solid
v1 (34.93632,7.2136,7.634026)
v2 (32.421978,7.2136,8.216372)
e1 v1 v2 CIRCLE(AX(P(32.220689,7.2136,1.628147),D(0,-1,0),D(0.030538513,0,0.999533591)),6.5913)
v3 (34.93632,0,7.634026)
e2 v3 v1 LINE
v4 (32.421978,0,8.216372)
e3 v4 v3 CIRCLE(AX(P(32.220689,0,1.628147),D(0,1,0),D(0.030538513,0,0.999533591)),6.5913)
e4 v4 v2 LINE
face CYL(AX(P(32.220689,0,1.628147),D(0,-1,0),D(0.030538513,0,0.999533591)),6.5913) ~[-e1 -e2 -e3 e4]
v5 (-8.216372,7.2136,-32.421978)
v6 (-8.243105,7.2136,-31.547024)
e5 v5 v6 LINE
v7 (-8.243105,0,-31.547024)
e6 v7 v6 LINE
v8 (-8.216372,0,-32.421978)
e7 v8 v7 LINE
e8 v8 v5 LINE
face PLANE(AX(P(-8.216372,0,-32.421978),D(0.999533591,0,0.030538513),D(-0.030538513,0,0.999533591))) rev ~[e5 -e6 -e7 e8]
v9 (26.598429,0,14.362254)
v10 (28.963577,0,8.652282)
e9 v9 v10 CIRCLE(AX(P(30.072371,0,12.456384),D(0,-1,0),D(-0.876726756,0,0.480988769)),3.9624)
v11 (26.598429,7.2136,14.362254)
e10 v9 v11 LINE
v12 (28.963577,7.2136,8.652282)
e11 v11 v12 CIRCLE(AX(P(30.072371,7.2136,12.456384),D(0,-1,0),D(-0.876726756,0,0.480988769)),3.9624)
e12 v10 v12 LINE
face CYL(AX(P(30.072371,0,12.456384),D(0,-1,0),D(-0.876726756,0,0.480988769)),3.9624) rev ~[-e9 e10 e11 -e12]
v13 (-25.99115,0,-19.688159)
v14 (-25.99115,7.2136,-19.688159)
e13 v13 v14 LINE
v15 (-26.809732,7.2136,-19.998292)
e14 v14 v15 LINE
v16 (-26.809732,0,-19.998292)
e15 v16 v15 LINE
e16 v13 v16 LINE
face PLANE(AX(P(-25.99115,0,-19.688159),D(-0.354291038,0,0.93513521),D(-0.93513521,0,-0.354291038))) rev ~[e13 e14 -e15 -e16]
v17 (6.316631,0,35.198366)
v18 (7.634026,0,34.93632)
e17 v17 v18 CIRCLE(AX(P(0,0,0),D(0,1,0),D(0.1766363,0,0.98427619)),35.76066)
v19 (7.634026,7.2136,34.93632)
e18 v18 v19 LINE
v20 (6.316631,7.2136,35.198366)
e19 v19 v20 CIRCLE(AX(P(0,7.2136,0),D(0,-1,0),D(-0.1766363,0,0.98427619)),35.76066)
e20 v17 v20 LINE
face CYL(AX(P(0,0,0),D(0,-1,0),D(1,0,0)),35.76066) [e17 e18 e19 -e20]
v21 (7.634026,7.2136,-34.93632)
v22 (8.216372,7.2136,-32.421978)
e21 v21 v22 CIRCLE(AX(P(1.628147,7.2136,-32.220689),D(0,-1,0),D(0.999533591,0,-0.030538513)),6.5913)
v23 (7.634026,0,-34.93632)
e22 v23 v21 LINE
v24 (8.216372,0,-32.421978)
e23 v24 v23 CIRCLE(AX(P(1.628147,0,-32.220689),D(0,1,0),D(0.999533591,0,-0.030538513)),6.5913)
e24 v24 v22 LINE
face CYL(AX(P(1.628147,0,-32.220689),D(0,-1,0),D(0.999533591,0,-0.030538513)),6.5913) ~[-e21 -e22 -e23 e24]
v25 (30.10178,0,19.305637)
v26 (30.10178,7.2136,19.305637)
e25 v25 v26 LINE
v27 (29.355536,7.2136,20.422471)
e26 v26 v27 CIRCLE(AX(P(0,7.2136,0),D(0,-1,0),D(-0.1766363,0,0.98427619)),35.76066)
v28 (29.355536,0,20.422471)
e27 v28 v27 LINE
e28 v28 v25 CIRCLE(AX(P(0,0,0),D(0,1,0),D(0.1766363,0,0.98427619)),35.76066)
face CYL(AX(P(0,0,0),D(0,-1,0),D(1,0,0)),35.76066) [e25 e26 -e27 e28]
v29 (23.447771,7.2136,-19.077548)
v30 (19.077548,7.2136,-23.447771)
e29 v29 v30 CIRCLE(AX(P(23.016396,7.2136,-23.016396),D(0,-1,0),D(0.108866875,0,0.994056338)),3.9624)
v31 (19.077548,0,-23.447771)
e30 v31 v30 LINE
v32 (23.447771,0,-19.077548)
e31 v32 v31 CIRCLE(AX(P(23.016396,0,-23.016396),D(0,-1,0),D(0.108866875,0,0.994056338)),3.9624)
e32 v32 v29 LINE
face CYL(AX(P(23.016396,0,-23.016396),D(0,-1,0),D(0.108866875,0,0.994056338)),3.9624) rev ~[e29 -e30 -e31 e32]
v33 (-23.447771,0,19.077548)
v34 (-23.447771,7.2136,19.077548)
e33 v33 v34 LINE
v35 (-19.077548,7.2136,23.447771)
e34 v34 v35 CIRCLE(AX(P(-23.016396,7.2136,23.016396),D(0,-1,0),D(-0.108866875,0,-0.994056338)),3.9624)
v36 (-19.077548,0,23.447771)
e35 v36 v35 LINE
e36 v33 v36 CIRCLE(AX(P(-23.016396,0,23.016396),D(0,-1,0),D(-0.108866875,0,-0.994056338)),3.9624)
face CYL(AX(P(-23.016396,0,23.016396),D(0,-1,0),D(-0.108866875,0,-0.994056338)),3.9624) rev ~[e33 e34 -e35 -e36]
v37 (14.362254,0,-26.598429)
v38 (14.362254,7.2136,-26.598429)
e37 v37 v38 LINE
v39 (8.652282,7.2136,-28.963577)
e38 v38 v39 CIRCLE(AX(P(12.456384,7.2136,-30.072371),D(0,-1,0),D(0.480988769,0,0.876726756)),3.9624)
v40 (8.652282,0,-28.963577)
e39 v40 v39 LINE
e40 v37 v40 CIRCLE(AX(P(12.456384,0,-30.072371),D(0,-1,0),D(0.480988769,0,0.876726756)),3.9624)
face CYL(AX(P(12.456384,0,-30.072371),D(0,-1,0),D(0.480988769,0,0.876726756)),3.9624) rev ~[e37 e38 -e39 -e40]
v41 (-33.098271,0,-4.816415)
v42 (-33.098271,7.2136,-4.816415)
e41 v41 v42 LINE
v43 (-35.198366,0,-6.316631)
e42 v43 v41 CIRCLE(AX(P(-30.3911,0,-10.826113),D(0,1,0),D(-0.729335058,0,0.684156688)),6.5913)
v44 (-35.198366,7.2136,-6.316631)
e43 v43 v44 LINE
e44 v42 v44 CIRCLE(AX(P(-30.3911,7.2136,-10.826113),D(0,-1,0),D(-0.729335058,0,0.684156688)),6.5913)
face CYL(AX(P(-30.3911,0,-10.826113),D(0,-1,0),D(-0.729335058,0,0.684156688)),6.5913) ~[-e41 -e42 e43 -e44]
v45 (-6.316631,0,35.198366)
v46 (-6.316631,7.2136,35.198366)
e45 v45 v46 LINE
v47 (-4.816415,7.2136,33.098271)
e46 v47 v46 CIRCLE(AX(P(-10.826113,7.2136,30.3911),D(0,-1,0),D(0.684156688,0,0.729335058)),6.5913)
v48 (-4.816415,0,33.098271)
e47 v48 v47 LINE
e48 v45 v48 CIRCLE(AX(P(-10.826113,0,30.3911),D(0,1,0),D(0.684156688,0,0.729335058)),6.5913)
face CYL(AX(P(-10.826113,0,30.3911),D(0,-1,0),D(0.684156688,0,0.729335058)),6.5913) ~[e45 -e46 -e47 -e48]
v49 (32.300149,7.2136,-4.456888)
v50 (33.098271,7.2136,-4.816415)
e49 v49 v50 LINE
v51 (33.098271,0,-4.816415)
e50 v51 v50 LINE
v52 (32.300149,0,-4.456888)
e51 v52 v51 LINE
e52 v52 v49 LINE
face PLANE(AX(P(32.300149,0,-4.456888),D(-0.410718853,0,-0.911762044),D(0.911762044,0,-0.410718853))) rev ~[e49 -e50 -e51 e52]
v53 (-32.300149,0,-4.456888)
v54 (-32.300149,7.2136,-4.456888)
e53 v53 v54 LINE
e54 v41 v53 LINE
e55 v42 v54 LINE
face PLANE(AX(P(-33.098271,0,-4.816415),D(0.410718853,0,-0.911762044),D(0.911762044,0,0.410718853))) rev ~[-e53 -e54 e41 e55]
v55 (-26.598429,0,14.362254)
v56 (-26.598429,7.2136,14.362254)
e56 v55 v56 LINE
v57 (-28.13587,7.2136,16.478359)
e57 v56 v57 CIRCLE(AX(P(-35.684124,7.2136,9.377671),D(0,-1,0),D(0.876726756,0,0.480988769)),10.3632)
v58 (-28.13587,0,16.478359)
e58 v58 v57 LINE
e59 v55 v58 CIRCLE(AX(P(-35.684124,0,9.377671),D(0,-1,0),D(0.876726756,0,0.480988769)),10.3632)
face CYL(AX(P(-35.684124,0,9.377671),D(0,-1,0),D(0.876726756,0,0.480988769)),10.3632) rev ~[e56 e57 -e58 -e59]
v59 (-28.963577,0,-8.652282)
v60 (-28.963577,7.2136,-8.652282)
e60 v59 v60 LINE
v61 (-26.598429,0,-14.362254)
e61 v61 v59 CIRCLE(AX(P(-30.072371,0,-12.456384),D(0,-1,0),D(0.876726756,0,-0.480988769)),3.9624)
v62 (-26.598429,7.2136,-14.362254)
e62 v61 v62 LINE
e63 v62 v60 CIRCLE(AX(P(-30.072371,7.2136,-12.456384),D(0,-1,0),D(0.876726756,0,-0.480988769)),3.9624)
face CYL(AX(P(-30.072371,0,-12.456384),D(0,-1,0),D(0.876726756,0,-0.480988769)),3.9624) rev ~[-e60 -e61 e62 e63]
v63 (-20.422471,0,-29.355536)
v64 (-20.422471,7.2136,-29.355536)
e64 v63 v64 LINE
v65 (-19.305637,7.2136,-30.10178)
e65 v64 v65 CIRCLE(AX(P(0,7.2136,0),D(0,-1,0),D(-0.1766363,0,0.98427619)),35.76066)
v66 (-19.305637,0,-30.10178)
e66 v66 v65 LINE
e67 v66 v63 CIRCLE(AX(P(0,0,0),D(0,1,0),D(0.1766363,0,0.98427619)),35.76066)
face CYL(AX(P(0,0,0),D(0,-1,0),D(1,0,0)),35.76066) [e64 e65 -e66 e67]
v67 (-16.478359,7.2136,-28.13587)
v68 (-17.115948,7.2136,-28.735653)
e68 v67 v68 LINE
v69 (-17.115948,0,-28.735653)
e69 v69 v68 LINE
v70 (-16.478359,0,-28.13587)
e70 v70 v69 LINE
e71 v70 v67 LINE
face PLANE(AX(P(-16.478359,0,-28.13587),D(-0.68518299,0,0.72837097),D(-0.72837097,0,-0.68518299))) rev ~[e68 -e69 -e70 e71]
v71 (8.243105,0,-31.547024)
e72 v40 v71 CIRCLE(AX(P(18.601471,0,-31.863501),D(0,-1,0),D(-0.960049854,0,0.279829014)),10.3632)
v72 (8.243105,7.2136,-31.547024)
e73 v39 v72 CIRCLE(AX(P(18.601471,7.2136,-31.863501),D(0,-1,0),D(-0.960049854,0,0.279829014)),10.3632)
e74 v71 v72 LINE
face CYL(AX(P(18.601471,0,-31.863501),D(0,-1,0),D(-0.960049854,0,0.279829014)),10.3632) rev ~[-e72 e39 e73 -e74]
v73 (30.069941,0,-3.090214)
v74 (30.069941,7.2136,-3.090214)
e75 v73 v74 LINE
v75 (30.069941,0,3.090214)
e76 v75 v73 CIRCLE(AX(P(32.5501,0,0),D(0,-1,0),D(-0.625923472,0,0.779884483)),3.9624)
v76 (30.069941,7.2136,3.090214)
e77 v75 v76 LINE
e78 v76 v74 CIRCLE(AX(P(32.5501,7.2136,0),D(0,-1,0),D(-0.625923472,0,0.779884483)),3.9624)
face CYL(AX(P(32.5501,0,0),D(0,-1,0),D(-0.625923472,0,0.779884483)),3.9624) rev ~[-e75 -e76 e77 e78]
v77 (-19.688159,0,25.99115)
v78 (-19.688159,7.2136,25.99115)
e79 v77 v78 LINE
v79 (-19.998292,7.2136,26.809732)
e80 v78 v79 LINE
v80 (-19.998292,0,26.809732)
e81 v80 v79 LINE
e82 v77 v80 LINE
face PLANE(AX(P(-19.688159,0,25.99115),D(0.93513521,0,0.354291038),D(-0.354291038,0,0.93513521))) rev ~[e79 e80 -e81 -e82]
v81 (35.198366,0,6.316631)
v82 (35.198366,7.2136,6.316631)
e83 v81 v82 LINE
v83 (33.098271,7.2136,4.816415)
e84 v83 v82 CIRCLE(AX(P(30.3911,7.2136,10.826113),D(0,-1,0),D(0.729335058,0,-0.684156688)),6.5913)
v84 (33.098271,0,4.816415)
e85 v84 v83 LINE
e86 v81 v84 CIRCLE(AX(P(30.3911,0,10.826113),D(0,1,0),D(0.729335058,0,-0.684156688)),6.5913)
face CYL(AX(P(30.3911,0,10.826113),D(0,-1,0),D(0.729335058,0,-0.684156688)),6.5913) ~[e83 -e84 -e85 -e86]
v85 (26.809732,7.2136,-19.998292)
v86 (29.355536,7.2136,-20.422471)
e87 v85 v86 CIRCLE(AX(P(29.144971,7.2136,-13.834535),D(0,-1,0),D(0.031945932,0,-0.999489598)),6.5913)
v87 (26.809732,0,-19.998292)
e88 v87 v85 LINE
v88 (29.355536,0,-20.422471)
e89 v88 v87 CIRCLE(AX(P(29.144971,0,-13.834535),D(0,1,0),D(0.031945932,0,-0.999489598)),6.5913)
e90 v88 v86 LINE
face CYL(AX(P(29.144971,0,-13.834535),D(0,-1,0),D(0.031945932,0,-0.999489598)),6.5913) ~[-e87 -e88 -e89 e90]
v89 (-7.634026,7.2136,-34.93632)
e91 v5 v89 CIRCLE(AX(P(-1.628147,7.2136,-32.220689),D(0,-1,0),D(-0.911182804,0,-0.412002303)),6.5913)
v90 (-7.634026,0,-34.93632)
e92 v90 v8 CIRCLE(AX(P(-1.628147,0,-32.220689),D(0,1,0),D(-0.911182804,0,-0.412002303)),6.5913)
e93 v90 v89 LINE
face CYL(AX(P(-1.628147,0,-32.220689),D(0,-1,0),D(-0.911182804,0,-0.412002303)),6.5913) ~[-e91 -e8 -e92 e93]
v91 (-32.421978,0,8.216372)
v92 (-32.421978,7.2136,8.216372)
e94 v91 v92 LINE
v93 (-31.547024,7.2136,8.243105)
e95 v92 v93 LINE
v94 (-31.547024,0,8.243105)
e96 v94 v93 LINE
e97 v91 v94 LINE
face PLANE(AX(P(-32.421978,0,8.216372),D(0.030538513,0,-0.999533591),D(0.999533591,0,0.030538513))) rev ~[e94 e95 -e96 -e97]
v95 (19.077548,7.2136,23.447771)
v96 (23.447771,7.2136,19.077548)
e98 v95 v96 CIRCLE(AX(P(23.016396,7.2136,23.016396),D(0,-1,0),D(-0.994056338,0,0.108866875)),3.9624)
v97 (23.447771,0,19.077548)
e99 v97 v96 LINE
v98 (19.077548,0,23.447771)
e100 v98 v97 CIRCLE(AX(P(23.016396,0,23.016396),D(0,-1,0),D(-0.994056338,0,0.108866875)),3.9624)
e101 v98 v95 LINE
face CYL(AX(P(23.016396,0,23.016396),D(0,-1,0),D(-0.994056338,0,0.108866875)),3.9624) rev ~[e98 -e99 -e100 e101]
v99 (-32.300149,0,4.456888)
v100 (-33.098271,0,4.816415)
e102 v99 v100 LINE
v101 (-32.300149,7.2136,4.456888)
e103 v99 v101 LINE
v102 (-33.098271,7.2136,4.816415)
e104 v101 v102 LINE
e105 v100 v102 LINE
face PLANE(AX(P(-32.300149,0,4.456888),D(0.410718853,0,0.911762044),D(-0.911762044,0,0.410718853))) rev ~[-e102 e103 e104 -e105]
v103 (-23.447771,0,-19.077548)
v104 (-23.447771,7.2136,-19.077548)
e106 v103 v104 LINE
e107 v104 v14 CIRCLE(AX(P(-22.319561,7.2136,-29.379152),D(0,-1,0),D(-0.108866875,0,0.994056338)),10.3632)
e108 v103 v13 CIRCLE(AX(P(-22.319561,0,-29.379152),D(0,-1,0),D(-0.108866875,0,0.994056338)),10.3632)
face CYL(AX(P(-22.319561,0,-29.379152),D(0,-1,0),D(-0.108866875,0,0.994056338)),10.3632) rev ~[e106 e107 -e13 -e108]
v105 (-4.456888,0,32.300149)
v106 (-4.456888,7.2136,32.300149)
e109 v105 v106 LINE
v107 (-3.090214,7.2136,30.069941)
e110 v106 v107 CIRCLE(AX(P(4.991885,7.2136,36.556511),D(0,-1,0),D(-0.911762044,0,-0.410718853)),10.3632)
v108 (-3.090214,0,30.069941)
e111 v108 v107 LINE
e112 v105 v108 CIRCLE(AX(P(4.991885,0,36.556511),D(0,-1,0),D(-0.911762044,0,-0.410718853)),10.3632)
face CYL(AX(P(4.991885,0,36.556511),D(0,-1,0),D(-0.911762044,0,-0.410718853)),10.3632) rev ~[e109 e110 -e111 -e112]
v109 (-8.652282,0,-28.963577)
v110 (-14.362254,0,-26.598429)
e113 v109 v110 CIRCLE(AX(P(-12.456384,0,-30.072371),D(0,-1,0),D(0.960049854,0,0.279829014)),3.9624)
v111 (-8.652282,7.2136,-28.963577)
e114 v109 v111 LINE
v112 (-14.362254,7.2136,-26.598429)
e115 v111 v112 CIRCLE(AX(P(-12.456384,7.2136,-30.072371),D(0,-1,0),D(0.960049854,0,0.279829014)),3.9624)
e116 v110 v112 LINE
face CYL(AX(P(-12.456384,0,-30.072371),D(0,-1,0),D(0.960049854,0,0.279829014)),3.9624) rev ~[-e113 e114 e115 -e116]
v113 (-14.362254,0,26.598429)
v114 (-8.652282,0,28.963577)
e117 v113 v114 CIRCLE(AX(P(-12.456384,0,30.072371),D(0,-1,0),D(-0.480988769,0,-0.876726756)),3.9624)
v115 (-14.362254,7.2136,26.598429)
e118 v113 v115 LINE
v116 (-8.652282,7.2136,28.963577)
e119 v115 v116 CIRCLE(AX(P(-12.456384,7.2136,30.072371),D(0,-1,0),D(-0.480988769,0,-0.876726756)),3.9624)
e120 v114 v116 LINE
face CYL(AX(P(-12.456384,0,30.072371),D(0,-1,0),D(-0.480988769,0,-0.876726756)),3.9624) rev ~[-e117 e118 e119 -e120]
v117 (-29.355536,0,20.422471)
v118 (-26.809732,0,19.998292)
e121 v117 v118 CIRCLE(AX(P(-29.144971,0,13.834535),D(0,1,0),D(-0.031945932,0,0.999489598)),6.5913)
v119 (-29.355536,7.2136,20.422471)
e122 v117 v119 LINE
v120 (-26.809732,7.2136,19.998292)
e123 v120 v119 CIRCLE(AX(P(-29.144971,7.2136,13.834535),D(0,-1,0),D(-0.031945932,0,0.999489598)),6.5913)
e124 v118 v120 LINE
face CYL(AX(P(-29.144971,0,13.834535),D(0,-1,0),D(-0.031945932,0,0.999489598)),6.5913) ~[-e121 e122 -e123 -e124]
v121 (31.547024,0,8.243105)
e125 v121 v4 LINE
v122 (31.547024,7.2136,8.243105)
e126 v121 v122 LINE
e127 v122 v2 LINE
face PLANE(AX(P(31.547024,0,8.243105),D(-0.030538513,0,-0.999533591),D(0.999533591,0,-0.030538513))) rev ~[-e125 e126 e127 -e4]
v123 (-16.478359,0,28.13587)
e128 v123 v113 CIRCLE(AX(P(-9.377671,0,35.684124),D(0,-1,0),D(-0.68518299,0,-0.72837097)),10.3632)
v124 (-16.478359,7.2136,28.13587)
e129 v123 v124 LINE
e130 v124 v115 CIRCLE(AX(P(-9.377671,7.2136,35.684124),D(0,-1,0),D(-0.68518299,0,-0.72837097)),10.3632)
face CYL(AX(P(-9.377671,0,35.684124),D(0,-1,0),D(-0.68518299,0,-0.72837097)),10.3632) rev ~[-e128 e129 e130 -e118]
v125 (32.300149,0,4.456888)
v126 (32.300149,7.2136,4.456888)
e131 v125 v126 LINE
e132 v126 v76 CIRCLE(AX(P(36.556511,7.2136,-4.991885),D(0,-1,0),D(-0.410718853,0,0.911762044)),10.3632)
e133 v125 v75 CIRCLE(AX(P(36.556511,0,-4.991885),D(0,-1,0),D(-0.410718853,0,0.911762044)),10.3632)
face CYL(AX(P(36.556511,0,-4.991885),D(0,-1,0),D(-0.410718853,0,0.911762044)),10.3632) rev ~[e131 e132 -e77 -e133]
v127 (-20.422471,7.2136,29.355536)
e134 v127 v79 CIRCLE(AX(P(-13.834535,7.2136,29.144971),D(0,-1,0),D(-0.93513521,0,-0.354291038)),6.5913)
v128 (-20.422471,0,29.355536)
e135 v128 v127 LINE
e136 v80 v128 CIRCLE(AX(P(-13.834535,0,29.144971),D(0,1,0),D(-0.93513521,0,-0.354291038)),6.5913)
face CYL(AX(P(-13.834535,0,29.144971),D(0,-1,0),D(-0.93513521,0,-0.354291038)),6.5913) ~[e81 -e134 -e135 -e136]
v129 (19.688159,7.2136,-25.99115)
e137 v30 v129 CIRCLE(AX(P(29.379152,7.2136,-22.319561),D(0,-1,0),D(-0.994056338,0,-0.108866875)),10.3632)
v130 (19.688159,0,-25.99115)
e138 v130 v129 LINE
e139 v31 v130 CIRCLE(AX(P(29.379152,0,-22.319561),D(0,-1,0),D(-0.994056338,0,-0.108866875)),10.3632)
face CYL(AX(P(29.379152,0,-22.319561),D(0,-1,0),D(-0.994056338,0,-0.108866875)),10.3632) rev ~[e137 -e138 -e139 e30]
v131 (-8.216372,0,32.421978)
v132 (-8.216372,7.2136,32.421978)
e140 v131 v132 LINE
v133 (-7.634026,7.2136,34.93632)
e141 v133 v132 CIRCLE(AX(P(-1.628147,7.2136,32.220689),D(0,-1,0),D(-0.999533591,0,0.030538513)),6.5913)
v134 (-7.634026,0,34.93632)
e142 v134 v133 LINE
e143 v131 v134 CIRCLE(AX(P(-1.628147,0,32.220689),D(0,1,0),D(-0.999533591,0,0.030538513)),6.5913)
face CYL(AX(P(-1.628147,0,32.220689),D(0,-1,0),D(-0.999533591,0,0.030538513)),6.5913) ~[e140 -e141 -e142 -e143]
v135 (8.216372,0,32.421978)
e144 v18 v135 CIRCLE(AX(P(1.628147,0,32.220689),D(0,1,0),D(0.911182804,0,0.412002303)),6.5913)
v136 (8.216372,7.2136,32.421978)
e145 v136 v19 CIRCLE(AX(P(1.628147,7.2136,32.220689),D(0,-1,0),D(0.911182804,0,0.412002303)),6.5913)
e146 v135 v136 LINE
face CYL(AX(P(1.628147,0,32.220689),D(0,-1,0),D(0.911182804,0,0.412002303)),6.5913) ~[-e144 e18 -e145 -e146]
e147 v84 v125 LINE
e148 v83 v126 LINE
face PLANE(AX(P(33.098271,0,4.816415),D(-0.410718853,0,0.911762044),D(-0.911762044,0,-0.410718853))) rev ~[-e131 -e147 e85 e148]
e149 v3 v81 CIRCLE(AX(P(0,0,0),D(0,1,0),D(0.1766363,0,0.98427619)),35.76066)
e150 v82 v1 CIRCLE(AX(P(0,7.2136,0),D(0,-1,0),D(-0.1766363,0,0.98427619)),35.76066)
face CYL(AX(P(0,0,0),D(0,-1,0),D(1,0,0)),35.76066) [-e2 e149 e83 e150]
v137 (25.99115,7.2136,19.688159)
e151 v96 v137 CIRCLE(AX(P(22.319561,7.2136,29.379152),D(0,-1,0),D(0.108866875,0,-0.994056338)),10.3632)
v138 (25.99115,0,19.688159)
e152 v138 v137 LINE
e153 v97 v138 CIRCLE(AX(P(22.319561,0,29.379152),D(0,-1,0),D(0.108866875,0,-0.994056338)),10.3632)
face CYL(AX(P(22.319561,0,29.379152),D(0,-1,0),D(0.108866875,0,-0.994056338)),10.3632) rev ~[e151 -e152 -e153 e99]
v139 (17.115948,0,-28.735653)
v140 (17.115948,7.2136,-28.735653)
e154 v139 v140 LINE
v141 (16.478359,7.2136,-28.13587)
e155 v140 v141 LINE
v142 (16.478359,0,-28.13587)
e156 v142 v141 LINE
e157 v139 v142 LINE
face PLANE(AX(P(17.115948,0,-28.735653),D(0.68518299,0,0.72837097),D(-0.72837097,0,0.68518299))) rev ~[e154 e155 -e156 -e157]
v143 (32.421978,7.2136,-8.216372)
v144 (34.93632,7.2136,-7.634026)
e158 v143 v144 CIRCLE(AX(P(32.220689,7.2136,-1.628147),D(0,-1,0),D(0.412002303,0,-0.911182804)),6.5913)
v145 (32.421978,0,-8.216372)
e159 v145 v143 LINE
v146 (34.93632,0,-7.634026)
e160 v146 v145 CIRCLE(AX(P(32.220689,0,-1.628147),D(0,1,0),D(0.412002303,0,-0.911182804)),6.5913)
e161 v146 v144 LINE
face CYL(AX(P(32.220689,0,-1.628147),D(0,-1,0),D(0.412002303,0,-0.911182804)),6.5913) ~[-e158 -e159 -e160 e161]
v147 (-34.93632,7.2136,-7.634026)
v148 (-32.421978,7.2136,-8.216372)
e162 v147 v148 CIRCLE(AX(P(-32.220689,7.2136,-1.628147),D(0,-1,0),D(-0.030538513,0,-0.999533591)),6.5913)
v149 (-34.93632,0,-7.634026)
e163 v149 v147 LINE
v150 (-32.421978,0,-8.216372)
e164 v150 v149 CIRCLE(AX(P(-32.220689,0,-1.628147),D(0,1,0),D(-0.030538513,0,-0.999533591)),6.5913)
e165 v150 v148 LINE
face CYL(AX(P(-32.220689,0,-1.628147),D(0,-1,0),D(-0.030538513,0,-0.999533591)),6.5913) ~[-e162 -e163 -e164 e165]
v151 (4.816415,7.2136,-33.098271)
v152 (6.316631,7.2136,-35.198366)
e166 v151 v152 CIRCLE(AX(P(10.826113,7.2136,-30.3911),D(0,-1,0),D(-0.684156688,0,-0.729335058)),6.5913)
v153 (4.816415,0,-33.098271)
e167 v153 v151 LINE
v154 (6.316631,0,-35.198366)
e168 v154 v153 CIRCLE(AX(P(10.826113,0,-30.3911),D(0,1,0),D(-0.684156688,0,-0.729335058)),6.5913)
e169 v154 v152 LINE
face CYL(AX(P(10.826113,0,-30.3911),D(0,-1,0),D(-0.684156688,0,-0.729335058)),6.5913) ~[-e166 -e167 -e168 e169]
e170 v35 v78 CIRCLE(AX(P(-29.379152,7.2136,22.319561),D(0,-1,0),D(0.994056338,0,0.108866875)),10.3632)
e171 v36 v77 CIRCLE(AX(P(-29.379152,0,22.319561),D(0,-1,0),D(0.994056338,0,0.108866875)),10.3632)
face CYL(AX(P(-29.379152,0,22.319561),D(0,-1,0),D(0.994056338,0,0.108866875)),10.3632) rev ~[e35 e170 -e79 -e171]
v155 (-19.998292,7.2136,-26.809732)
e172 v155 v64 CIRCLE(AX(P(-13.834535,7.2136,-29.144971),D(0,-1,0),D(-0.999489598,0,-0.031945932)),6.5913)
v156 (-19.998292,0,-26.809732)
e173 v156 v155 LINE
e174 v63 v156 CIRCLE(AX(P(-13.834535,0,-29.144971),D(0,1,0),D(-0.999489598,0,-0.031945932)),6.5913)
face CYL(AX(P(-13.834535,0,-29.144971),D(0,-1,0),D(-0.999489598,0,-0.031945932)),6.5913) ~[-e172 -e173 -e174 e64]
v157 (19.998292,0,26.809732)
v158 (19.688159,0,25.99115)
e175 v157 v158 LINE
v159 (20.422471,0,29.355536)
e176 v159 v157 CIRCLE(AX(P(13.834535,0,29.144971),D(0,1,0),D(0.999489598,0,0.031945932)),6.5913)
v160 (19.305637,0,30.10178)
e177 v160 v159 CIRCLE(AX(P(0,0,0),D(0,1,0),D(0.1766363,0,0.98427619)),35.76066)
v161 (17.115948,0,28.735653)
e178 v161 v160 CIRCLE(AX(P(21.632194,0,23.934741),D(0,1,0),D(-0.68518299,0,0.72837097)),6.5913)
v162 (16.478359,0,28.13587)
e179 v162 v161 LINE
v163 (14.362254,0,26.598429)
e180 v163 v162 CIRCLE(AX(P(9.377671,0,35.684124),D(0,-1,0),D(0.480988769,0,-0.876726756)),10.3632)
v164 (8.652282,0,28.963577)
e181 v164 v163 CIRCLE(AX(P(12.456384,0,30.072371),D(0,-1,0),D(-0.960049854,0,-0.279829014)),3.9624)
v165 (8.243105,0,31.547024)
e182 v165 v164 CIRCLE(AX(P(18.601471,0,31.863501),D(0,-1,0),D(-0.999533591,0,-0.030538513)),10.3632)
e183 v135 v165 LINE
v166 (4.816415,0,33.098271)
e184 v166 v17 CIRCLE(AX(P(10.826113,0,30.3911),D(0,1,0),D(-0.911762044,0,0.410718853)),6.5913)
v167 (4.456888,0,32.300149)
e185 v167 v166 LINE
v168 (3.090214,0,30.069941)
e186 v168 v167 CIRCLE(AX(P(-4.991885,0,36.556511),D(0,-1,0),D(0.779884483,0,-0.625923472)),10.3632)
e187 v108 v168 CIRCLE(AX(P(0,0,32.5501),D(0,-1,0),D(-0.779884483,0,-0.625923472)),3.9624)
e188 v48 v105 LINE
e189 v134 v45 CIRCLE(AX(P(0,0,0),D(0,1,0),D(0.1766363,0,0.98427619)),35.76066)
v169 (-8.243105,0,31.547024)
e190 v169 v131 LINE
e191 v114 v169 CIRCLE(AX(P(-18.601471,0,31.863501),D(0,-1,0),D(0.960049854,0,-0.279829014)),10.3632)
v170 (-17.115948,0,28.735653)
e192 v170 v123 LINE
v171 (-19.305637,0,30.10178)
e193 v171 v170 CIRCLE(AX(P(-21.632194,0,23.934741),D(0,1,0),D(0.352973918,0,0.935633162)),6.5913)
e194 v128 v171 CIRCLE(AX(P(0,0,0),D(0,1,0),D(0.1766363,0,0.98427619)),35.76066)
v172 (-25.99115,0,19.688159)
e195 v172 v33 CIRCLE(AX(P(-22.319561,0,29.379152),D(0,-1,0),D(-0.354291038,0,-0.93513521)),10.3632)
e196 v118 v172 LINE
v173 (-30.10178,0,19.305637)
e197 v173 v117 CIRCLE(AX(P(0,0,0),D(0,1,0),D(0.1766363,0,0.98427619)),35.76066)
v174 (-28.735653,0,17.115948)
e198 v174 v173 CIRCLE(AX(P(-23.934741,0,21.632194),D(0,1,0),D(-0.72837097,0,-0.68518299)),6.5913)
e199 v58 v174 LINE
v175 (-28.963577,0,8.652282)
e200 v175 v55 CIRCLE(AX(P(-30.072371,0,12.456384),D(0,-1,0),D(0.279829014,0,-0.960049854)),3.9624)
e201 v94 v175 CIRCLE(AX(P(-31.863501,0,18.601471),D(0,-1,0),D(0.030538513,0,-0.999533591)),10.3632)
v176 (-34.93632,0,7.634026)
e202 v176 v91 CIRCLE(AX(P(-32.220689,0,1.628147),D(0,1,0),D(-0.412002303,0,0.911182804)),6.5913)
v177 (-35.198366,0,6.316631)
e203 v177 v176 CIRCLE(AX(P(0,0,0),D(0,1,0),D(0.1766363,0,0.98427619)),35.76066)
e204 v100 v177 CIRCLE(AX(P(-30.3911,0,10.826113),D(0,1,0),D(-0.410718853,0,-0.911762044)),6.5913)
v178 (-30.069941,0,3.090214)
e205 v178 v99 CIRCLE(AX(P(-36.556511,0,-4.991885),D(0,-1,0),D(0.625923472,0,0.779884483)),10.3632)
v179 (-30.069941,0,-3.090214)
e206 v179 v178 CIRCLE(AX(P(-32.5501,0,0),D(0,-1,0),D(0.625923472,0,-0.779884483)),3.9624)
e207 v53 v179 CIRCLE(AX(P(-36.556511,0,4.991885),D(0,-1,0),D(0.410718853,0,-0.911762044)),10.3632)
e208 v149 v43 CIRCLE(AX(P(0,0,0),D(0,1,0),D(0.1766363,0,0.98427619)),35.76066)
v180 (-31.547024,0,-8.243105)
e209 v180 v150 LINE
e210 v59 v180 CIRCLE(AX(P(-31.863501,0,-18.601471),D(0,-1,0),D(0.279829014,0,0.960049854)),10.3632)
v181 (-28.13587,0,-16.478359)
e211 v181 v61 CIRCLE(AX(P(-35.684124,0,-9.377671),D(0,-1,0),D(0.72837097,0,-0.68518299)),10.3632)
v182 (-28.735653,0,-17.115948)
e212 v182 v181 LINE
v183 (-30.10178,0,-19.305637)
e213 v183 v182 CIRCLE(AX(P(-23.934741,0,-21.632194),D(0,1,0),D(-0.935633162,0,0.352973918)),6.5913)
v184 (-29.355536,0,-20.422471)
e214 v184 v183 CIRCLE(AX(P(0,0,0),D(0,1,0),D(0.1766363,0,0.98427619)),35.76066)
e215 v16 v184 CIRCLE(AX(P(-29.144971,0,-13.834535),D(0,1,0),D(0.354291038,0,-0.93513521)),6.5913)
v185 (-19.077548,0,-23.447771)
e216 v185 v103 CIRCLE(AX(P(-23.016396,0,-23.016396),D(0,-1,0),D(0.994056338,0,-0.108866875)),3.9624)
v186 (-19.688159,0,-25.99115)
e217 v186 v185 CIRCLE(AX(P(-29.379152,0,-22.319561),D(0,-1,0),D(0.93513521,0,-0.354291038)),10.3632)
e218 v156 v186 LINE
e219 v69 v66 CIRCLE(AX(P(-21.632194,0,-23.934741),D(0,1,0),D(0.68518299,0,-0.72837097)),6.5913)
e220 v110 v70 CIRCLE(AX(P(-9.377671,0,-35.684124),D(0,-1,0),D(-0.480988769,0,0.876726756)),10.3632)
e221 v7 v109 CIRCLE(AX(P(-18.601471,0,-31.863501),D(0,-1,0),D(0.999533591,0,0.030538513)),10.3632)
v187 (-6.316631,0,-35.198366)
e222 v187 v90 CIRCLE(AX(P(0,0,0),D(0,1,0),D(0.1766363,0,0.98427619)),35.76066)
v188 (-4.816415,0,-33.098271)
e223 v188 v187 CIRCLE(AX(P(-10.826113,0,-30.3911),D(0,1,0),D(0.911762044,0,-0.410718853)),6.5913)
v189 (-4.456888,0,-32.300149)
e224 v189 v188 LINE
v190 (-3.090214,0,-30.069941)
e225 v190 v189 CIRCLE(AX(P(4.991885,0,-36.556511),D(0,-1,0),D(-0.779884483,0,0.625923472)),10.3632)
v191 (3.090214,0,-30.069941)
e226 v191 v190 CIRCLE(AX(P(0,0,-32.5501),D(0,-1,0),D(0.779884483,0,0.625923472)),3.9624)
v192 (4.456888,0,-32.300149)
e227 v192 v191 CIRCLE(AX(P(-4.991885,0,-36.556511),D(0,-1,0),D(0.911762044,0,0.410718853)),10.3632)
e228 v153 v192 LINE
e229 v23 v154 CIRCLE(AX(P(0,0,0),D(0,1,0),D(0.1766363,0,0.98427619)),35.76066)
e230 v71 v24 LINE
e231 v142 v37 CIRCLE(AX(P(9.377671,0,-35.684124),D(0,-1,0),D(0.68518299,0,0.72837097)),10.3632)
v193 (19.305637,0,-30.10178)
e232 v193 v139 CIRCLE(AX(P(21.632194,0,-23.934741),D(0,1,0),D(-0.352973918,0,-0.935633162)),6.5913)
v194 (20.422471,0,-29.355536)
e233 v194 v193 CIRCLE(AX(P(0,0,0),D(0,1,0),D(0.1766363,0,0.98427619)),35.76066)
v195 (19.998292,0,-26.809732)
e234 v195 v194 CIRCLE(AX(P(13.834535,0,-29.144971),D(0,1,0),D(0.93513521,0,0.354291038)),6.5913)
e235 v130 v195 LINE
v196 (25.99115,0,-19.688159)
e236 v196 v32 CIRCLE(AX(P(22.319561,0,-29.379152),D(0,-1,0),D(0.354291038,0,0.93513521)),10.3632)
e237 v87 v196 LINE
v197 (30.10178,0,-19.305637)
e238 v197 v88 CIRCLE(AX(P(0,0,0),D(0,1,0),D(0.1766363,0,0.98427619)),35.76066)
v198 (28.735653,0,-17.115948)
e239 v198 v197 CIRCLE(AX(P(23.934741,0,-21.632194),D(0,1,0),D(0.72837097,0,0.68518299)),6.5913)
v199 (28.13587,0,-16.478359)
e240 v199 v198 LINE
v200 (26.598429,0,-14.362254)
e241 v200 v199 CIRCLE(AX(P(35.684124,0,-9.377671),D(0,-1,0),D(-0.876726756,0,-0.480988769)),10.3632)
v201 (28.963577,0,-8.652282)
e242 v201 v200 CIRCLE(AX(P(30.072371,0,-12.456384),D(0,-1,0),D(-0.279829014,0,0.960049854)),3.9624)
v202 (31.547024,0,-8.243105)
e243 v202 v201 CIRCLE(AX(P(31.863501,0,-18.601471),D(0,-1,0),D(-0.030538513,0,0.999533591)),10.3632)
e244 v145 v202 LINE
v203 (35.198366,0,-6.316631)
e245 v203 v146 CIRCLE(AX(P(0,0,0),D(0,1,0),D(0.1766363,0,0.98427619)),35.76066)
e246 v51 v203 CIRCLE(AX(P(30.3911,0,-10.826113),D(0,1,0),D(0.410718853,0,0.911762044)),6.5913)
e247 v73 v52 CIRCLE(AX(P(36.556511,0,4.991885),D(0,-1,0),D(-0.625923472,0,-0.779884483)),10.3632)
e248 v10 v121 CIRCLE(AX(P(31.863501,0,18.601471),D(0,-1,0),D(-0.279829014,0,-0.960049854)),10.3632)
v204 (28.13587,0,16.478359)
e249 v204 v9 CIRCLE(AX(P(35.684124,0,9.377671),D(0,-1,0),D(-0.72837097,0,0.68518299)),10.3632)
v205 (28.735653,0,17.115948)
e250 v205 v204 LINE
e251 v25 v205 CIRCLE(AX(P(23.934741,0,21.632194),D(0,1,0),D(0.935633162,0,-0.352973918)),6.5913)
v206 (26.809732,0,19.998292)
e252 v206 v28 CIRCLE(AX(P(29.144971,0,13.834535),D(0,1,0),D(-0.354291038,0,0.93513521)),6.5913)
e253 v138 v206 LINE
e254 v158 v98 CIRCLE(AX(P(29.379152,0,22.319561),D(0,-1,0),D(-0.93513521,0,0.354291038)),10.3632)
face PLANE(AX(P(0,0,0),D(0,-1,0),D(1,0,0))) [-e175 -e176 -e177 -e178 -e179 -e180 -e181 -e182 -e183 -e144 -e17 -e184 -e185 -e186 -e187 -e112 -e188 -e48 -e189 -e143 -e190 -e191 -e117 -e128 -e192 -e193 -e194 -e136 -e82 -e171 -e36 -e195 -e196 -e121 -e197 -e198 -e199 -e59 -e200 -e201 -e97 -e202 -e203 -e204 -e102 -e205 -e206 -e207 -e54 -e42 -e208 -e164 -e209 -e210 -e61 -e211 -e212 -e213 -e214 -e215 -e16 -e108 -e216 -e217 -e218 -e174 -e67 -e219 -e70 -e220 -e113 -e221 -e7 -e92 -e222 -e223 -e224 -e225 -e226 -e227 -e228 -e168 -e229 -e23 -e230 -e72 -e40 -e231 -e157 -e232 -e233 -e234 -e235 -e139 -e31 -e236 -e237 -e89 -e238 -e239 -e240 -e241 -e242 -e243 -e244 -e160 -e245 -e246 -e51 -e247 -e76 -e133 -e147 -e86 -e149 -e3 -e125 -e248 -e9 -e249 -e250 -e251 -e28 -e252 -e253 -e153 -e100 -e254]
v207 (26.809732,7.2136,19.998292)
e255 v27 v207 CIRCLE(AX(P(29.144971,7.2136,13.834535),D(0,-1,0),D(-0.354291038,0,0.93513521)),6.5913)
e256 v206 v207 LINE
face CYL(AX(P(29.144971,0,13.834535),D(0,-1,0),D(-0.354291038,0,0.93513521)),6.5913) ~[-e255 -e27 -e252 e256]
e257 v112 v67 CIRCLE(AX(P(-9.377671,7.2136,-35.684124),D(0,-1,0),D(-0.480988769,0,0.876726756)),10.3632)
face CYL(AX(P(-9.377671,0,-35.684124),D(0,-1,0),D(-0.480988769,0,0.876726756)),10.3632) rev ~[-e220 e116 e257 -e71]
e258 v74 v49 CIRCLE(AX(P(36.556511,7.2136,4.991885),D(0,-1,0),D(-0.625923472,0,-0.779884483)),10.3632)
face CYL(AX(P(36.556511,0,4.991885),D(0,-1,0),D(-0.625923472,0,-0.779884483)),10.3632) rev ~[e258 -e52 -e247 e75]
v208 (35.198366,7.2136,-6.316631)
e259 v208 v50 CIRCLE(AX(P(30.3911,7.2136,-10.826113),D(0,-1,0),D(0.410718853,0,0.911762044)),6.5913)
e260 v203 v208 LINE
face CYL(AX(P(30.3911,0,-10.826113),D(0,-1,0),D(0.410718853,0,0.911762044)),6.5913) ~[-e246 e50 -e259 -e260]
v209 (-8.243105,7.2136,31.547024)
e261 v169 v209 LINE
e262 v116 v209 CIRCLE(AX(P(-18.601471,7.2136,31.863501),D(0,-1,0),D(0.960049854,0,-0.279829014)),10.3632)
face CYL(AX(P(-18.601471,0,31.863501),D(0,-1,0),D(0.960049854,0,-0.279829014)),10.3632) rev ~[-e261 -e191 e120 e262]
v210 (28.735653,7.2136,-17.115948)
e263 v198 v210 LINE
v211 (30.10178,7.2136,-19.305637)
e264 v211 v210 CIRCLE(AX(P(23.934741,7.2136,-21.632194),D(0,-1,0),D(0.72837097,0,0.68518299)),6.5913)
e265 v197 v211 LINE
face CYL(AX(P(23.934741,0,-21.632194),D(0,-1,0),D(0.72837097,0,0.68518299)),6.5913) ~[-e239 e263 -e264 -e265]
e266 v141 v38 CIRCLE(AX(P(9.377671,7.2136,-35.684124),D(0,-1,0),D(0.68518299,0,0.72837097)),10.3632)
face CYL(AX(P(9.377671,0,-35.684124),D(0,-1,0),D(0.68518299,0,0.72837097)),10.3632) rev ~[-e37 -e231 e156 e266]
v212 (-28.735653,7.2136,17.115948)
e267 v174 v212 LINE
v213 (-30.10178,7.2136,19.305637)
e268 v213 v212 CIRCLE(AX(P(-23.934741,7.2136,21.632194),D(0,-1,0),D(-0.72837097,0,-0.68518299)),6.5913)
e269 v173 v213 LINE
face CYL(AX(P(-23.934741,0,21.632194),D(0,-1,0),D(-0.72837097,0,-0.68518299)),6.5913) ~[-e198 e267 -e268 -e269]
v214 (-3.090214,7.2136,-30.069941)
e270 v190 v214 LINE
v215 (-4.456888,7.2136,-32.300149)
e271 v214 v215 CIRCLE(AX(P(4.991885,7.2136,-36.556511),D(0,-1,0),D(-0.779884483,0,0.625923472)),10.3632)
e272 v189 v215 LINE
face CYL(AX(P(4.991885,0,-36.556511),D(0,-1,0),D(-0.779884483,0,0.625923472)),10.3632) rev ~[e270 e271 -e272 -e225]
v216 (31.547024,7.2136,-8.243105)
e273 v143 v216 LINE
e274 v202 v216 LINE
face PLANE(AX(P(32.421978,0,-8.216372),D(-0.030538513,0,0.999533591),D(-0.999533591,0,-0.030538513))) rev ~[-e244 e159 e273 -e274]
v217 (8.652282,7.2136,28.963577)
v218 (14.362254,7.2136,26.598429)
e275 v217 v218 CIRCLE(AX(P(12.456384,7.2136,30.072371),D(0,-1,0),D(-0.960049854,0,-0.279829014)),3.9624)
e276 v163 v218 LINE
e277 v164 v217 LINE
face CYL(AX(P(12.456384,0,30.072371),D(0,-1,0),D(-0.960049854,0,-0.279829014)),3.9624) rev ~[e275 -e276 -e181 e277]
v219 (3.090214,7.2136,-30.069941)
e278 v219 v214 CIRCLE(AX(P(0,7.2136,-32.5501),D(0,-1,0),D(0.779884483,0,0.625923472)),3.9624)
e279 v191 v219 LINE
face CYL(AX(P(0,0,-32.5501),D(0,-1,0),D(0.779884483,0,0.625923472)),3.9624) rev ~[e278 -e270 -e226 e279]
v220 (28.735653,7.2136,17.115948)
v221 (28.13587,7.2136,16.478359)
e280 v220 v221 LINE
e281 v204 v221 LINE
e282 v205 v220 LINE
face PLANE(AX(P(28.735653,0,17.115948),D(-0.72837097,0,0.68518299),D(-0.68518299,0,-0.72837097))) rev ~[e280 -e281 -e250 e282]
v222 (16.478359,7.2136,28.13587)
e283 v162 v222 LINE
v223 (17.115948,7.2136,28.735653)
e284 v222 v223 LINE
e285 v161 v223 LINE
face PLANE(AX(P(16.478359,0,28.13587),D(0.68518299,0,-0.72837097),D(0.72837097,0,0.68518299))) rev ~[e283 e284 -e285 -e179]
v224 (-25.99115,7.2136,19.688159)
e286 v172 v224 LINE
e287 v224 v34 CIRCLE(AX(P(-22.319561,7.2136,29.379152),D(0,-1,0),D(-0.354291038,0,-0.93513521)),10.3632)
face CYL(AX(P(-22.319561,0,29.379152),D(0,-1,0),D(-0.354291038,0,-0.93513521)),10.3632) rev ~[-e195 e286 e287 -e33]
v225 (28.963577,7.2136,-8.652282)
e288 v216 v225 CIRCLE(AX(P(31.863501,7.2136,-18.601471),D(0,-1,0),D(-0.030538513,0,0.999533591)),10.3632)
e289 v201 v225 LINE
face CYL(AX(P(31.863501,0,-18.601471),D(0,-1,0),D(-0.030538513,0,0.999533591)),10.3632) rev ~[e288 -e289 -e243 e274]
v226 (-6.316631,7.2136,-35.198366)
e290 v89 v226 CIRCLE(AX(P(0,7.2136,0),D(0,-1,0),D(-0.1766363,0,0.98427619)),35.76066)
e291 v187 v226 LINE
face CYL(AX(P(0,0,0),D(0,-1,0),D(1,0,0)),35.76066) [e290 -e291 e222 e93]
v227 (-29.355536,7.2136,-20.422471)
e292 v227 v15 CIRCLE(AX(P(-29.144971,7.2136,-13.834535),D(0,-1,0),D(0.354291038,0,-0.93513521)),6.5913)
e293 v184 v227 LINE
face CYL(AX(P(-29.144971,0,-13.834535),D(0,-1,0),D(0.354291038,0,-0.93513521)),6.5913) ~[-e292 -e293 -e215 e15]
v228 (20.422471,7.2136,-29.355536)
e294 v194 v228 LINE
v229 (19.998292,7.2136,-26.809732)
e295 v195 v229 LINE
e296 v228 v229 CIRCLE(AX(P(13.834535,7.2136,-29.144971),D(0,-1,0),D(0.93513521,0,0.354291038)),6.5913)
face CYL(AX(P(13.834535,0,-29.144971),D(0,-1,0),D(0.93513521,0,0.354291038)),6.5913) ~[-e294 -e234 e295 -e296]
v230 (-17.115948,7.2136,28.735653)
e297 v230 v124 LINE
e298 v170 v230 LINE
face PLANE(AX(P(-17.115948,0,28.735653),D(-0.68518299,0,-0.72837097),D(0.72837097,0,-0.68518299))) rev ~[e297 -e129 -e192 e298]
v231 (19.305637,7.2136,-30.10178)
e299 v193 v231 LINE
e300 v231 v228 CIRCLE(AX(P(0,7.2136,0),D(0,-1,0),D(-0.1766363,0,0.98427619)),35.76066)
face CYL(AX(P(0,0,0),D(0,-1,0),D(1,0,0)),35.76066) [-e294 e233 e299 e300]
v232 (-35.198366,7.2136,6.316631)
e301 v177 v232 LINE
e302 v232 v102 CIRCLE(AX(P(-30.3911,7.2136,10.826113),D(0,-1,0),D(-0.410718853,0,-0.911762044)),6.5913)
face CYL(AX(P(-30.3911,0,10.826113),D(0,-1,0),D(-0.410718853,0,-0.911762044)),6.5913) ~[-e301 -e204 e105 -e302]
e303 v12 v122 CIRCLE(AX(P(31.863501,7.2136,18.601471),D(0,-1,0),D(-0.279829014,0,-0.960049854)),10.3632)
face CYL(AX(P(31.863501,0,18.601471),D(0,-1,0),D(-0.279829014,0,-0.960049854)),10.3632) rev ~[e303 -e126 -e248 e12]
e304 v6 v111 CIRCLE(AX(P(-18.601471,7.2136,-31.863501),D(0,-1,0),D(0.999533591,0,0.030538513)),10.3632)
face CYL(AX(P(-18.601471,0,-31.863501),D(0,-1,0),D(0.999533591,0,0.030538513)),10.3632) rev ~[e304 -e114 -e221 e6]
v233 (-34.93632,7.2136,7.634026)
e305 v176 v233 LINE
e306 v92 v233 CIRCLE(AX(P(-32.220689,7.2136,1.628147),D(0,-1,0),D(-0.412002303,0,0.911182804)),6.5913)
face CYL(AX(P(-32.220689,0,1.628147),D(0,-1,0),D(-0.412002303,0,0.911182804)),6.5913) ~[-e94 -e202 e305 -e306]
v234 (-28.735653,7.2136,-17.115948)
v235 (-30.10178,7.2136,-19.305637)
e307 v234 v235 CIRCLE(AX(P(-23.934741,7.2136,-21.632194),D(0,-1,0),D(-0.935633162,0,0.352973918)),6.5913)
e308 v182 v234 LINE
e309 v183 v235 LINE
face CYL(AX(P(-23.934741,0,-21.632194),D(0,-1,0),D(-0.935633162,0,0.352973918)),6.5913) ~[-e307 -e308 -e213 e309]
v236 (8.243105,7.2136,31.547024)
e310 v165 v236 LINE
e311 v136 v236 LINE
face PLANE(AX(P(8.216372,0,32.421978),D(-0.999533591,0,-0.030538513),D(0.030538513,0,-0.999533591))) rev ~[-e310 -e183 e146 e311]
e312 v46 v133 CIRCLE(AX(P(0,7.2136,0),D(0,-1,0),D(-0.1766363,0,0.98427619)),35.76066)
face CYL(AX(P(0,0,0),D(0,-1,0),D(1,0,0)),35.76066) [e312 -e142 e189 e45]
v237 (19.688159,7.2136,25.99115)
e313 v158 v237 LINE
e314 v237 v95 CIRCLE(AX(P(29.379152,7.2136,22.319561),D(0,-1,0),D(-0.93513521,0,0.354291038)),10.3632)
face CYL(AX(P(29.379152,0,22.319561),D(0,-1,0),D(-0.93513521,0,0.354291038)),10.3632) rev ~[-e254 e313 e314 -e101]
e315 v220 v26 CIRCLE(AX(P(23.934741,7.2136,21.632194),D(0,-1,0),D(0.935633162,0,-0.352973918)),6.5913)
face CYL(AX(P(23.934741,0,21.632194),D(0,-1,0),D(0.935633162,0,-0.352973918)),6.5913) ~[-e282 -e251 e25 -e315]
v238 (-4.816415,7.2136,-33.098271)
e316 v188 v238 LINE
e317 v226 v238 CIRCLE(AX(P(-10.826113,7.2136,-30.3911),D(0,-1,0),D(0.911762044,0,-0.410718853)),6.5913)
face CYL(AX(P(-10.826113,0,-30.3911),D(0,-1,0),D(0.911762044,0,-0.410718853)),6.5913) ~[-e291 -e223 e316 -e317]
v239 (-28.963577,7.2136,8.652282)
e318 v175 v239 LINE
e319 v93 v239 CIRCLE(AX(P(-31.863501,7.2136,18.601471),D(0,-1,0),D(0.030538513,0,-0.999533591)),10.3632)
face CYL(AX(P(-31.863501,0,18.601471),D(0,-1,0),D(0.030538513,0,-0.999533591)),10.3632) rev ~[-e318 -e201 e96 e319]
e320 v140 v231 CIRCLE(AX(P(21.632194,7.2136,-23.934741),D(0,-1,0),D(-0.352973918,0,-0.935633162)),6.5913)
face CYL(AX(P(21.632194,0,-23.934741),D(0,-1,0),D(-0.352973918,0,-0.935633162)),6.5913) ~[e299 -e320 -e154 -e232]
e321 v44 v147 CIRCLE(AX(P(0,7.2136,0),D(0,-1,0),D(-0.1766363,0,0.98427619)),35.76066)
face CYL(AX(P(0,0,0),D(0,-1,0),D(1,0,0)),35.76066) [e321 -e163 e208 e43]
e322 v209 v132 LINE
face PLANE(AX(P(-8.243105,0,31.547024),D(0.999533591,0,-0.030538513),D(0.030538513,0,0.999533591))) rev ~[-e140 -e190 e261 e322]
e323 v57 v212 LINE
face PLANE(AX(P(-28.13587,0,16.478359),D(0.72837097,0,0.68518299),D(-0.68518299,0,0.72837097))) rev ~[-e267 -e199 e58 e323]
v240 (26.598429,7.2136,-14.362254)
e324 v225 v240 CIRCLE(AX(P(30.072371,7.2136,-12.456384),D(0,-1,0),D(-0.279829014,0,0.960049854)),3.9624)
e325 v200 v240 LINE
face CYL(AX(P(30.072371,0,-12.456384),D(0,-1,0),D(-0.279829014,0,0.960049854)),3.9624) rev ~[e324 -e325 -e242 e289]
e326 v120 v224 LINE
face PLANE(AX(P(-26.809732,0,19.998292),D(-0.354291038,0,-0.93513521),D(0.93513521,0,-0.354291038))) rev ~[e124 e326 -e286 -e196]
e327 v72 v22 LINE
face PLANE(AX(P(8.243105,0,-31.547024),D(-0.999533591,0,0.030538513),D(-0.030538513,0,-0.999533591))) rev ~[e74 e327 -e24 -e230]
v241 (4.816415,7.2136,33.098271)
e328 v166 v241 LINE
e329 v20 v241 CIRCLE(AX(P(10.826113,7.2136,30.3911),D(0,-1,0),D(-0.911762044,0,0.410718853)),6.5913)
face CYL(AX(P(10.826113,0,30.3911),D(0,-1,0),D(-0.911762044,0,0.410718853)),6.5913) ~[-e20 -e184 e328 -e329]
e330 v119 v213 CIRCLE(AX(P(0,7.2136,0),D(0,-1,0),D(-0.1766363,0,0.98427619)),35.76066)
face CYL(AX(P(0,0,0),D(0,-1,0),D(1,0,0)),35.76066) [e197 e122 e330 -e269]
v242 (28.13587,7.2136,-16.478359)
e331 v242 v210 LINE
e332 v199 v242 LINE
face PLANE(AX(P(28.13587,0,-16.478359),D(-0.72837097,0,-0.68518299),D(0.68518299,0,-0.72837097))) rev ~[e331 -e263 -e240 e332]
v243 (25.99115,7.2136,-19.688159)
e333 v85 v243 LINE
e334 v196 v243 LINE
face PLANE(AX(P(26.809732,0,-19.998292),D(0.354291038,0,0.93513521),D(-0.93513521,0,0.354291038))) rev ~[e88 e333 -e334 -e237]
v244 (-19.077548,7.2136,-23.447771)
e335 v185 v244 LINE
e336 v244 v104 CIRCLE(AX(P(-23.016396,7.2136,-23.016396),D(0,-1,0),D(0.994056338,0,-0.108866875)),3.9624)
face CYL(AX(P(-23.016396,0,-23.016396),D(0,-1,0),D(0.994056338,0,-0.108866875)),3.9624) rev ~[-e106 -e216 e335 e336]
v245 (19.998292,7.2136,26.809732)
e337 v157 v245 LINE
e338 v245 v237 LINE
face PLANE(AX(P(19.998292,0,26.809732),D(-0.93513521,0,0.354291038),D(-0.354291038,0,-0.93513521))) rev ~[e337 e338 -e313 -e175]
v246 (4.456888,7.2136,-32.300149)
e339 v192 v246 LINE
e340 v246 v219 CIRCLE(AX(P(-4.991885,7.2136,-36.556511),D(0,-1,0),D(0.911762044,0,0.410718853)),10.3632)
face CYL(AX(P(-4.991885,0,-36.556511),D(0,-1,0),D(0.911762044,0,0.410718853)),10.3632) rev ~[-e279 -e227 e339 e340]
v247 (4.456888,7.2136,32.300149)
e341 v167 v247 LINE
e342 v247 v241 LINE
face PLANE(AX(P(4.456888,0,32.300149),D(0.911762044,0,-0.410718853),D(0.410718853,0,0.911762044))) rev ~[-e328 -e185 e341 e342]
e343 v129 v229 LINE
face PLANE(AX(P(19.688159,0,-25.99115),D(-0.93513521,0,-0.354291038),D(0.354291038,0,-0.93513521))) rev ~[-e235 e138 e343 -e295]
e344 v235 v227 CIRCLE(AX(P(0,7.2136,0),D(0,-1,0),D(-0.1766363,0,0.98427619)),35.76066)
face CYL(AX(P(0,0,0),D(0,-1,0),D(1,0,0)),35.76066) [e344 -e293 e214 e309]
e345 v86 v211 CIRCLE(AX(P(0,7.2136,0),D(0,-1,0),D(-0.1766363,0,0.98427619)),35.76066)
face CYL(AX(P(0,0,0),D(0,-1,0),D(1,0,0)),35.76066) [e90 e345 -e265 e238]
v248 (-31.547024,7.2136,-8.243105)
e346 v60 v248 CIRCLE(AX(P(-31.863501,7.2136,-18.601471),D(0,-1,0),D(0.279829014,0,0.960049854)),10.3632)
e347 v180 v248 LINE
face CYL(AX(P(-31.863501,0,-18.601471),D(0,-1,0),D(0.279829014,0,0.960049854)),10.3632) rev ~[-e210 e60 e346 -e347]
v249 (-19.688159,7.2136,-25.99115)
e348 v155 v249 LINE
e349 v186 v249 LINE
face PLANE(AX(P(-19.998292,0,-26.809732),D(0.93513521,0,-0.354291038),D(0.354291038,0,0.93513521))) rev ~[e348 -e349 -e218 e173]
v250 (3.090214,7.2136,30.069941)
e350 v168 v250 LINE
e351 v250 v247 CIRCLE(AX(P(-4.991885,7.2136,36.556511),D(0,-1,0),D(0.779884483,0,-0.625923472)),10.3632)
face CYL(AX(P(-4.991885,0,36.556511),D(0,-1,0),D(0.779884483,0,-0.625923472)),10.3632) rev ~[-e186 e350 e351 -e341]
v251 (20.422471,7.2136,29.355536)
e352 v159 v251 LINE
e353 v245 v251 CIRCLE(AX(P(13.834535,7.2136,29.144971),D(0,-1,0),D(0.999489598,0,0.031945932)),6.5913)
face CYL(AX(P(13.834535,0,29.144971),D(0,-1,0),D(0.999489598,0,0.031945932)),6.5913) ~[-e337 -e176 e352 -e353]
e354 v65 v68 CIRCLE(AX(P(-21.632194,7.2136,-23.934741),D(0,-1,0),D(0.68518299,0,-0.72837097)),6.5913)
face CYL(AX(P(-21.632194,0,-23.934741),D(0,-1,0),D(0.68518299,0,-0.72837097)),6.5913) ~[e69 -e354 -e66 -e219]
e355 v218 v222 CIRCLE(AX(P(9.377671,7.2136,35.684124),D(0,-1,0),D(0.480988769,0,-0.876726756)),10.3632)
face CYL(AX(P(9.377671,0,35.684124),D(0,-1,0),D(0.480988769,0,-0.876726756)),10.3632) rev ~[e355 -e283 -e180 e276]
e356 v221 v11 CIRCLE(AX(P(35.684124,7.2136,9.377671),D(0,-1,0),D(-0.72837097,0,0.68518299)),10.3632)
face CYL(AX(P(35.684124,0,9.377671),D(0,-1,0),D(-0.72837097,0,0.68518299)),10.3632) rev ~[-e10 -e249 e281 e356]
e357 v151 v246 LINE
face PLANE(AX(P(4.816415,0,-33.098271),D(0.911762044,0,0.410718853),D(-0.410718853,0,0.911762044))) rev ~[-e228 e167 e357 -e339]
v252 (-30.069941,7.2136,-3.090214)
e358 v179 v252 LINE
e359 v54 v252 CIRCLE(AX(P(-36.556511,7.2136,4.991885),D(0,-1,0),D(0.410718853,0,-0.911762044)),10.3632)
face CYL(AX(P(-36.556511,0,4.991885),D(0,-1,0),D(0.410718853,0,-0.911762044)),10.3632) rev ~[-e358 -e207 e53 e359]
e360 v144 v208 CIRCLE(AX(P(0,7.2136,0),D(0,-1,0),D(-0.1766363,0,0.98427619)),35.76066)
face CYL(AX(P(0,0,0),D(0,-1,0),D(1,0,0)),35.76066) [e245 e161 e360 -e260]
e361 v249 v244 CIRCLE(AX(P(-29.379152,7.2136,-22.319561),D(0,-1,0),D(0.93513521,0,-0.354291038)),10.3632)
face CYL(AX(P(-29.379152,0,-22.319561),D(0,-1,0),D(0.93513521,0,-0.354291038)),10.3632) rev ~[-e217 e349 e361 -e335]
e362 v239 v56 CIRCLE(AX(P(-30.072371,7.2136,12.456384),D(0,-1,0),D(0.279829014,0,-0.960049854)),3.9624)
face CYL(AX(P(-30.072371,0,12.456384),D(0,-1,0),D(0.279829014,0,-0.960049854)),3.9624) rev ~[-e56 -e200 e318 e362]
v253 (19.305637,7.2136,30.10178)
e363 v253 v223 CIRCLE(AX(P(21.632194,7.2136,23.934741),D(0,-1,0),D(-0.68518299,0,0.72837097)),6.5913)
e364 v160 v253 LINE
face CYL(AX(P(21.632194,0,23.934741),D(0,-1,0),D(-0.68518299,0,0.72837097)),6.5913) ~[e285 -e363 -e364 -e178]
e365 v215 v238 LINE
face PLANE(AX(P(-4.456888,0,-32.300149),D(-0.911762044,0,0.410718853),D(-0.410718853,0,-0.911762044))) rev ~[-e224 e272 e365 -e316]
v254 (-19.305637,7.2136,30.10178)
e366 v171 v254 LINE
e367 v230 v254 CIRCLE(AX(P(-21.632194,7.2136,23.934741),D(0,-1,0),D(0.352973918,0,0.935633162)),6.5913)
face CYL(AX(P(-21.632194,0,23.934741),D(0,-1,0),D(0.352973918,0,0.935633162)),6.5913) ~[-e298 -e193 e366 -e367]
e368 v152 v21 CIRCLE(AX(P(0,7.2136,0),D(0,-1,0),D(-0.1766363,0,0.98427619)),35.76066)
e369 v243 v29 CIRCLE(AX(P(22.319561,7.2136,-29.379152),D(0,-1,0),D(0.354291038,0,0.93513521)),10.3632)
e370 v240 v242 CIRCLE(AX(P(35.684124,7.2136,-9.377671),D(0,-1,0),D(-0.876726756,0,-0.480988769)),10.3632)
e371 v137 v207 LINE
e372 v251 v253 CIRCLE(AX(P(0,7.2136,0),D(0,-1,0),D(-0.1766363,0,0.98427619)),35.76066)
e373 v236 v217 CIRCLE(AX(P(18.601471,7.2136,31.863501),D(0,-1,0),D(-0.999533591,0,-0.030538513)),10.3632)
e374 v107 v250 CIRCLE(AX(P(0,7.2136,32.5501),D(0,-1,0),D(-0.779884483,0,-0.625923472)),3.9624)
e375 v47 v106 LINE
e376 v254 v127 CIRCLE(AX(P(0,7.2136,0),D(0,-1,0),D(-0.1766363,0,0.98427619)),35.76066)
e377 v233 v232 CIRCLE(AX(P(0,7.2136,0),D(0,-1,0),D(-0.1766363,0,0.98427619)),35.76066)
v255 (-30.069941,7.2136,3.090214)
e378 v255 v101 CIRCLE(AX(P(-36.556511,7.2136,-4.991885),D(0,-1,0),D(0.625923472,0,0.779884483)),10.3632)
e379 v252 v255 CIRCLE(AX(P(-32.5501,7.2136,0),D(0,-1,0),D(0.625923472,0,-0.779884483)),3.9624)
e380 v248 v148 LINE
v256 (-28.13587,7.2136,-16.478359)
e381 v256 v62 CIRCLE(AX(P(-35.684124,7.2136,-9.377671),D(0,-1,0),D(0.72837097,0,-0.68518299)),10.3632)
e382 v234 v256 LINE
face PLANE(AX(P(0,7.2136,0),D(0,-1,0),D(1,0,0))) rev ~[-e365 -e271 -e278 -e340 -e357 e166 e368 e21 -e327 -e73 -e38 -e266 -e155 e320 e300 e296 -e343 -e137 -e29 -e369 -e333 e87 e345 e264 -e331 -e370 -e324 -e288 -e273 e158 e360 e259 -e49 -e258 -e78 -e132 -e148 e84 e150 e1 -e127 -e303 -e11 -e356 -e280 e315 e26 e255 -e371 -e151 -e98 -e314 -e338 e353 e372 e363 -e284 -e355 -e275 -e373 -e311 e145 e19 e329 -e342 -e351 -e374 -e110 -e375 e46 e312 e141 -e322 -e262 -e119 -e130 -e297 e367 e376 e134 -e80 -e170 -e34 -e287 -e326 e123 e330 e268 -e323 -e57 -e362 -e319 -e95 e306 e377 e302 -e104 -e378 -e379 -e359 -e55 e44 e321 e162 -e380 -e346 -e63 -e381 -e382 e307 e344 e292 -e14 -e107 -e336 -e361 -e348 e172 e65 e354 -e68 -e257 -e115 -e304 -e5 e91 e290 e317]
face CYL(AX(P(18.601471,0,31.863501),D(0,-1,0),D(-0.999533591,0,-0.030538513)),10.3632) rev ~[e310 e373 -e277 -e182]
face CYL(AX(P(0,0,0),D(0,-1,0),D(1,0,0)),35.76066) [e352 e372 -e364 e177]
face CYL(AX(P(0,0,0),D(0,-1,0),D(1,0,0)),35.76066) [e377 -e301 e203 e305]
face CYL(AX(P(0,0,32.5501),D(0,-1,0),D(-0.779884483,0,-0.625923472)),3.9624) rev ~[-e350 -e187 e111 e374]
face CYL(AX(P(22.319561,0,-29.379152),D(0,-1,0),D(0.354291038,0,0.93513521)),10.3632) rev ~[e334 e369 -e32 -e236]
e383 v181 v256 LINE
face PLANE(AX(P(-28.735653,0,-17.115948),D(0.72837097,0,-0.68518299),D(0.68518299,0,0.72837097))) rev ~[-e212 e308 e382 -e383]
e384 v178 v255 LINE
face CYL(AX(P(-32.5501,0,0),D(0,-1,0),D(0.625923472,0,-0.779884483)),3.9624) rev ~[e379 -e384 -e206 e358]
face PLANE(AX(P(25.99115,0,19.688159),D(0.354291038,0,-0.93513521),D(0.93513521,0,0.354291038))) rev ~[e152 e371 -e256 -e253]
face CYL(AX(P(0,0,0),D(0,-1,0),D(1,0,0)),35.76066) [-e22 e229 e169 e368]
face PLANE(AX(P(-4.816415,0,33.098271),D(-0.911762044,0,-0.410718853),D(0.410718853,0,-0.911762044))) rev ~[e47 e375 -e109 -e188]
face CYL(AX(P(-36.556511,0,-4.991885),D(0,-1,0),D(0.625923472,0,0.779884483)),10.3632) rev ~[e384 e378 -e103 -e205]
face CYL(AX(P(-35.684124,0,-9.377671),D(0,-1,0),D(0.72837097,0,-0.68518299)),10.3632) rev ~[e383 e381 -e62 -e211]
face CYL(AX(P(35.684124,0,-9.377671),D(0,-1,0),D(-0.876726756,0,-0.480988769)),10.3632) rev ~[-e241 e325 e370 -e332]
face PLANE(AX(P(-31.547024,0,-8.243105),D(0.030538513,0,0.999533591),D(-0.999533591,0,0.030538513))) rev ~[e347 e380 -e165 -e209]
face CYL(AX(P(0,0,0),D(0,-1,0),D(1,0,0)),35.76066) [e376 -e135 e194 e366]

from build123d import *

# Parameters (mm, degrees)
F0_R            = 35.76066
F1_DEPTH        = 7.2136
F3_DEPTH        = 7.2146
F3_COPIES_COUNT = 16


# Not quite as in the source:
# - a pattern or mirror of a feature is missing from the dataset's text; its kind, count and spacing are read off the source's solid


with BuildPart() as f1:
    # F0 (on Front) → F1 (new body)
    with BuildSketch(Plane.XZ):
        Circle(F0_R)
    extrude(amount=-F1_DEPTH)

    # F2 (on face) → F3 (cut, through all)
    with BuildSketch(Plane.XZ):
        with BuildLine():
            Line((-4.8164154778, 33.0982711732), (-4.4568878106, 32.3001493474))
            ThreePointArc((-4.4568878106, 32.3001493474), (-3.8441959519, 31.1417538349), (-3.0902142758, 30.0699408338))
            ThreePointArc((-3.0902142758, 30.0699408338), (0, 28.5877), (3.0902142758, 30.0699408338))
            ThreePointArc((3.0902142758, 30.0699408338), (3.8441959519, 31.1417538349), (4.4568878106, 32.3001493474))
            Line((4.4568878106, 32.3001493474), (4.8164154778, 33.0982711732))
            ThreePointArc((4.8164154778, 33.0982711732), (5.4627291736, 34.2224644474), (6.3166306588, 35.198366166))
            ThreePointArc((6.3166306588, 35.198366166), (0, 35.76066), (-6.3166306588, 35.198366166))
            ThreePointArc((-6.3166306588, 35.198366166), (-5.4627291736, 34.2224644474), (-4.8164154778, 33.0982711732))
        make_face()
    f3 = extrude(amount=-F3_DEPTH, mode=Mode.SUBTRACT)

    # F3_copies: F3 ×16 about axis
    f3_copies_axis = Axis((0, 0, 0), (0, 1, 0))
    for i in range(1, F3_COPIES_COUNT):
        add(f3.rotate(f3_copies_axis, i * 360 / F3_COPIES_COUNT), mode=Mode.SUBTRACT)


solid = f1.part
